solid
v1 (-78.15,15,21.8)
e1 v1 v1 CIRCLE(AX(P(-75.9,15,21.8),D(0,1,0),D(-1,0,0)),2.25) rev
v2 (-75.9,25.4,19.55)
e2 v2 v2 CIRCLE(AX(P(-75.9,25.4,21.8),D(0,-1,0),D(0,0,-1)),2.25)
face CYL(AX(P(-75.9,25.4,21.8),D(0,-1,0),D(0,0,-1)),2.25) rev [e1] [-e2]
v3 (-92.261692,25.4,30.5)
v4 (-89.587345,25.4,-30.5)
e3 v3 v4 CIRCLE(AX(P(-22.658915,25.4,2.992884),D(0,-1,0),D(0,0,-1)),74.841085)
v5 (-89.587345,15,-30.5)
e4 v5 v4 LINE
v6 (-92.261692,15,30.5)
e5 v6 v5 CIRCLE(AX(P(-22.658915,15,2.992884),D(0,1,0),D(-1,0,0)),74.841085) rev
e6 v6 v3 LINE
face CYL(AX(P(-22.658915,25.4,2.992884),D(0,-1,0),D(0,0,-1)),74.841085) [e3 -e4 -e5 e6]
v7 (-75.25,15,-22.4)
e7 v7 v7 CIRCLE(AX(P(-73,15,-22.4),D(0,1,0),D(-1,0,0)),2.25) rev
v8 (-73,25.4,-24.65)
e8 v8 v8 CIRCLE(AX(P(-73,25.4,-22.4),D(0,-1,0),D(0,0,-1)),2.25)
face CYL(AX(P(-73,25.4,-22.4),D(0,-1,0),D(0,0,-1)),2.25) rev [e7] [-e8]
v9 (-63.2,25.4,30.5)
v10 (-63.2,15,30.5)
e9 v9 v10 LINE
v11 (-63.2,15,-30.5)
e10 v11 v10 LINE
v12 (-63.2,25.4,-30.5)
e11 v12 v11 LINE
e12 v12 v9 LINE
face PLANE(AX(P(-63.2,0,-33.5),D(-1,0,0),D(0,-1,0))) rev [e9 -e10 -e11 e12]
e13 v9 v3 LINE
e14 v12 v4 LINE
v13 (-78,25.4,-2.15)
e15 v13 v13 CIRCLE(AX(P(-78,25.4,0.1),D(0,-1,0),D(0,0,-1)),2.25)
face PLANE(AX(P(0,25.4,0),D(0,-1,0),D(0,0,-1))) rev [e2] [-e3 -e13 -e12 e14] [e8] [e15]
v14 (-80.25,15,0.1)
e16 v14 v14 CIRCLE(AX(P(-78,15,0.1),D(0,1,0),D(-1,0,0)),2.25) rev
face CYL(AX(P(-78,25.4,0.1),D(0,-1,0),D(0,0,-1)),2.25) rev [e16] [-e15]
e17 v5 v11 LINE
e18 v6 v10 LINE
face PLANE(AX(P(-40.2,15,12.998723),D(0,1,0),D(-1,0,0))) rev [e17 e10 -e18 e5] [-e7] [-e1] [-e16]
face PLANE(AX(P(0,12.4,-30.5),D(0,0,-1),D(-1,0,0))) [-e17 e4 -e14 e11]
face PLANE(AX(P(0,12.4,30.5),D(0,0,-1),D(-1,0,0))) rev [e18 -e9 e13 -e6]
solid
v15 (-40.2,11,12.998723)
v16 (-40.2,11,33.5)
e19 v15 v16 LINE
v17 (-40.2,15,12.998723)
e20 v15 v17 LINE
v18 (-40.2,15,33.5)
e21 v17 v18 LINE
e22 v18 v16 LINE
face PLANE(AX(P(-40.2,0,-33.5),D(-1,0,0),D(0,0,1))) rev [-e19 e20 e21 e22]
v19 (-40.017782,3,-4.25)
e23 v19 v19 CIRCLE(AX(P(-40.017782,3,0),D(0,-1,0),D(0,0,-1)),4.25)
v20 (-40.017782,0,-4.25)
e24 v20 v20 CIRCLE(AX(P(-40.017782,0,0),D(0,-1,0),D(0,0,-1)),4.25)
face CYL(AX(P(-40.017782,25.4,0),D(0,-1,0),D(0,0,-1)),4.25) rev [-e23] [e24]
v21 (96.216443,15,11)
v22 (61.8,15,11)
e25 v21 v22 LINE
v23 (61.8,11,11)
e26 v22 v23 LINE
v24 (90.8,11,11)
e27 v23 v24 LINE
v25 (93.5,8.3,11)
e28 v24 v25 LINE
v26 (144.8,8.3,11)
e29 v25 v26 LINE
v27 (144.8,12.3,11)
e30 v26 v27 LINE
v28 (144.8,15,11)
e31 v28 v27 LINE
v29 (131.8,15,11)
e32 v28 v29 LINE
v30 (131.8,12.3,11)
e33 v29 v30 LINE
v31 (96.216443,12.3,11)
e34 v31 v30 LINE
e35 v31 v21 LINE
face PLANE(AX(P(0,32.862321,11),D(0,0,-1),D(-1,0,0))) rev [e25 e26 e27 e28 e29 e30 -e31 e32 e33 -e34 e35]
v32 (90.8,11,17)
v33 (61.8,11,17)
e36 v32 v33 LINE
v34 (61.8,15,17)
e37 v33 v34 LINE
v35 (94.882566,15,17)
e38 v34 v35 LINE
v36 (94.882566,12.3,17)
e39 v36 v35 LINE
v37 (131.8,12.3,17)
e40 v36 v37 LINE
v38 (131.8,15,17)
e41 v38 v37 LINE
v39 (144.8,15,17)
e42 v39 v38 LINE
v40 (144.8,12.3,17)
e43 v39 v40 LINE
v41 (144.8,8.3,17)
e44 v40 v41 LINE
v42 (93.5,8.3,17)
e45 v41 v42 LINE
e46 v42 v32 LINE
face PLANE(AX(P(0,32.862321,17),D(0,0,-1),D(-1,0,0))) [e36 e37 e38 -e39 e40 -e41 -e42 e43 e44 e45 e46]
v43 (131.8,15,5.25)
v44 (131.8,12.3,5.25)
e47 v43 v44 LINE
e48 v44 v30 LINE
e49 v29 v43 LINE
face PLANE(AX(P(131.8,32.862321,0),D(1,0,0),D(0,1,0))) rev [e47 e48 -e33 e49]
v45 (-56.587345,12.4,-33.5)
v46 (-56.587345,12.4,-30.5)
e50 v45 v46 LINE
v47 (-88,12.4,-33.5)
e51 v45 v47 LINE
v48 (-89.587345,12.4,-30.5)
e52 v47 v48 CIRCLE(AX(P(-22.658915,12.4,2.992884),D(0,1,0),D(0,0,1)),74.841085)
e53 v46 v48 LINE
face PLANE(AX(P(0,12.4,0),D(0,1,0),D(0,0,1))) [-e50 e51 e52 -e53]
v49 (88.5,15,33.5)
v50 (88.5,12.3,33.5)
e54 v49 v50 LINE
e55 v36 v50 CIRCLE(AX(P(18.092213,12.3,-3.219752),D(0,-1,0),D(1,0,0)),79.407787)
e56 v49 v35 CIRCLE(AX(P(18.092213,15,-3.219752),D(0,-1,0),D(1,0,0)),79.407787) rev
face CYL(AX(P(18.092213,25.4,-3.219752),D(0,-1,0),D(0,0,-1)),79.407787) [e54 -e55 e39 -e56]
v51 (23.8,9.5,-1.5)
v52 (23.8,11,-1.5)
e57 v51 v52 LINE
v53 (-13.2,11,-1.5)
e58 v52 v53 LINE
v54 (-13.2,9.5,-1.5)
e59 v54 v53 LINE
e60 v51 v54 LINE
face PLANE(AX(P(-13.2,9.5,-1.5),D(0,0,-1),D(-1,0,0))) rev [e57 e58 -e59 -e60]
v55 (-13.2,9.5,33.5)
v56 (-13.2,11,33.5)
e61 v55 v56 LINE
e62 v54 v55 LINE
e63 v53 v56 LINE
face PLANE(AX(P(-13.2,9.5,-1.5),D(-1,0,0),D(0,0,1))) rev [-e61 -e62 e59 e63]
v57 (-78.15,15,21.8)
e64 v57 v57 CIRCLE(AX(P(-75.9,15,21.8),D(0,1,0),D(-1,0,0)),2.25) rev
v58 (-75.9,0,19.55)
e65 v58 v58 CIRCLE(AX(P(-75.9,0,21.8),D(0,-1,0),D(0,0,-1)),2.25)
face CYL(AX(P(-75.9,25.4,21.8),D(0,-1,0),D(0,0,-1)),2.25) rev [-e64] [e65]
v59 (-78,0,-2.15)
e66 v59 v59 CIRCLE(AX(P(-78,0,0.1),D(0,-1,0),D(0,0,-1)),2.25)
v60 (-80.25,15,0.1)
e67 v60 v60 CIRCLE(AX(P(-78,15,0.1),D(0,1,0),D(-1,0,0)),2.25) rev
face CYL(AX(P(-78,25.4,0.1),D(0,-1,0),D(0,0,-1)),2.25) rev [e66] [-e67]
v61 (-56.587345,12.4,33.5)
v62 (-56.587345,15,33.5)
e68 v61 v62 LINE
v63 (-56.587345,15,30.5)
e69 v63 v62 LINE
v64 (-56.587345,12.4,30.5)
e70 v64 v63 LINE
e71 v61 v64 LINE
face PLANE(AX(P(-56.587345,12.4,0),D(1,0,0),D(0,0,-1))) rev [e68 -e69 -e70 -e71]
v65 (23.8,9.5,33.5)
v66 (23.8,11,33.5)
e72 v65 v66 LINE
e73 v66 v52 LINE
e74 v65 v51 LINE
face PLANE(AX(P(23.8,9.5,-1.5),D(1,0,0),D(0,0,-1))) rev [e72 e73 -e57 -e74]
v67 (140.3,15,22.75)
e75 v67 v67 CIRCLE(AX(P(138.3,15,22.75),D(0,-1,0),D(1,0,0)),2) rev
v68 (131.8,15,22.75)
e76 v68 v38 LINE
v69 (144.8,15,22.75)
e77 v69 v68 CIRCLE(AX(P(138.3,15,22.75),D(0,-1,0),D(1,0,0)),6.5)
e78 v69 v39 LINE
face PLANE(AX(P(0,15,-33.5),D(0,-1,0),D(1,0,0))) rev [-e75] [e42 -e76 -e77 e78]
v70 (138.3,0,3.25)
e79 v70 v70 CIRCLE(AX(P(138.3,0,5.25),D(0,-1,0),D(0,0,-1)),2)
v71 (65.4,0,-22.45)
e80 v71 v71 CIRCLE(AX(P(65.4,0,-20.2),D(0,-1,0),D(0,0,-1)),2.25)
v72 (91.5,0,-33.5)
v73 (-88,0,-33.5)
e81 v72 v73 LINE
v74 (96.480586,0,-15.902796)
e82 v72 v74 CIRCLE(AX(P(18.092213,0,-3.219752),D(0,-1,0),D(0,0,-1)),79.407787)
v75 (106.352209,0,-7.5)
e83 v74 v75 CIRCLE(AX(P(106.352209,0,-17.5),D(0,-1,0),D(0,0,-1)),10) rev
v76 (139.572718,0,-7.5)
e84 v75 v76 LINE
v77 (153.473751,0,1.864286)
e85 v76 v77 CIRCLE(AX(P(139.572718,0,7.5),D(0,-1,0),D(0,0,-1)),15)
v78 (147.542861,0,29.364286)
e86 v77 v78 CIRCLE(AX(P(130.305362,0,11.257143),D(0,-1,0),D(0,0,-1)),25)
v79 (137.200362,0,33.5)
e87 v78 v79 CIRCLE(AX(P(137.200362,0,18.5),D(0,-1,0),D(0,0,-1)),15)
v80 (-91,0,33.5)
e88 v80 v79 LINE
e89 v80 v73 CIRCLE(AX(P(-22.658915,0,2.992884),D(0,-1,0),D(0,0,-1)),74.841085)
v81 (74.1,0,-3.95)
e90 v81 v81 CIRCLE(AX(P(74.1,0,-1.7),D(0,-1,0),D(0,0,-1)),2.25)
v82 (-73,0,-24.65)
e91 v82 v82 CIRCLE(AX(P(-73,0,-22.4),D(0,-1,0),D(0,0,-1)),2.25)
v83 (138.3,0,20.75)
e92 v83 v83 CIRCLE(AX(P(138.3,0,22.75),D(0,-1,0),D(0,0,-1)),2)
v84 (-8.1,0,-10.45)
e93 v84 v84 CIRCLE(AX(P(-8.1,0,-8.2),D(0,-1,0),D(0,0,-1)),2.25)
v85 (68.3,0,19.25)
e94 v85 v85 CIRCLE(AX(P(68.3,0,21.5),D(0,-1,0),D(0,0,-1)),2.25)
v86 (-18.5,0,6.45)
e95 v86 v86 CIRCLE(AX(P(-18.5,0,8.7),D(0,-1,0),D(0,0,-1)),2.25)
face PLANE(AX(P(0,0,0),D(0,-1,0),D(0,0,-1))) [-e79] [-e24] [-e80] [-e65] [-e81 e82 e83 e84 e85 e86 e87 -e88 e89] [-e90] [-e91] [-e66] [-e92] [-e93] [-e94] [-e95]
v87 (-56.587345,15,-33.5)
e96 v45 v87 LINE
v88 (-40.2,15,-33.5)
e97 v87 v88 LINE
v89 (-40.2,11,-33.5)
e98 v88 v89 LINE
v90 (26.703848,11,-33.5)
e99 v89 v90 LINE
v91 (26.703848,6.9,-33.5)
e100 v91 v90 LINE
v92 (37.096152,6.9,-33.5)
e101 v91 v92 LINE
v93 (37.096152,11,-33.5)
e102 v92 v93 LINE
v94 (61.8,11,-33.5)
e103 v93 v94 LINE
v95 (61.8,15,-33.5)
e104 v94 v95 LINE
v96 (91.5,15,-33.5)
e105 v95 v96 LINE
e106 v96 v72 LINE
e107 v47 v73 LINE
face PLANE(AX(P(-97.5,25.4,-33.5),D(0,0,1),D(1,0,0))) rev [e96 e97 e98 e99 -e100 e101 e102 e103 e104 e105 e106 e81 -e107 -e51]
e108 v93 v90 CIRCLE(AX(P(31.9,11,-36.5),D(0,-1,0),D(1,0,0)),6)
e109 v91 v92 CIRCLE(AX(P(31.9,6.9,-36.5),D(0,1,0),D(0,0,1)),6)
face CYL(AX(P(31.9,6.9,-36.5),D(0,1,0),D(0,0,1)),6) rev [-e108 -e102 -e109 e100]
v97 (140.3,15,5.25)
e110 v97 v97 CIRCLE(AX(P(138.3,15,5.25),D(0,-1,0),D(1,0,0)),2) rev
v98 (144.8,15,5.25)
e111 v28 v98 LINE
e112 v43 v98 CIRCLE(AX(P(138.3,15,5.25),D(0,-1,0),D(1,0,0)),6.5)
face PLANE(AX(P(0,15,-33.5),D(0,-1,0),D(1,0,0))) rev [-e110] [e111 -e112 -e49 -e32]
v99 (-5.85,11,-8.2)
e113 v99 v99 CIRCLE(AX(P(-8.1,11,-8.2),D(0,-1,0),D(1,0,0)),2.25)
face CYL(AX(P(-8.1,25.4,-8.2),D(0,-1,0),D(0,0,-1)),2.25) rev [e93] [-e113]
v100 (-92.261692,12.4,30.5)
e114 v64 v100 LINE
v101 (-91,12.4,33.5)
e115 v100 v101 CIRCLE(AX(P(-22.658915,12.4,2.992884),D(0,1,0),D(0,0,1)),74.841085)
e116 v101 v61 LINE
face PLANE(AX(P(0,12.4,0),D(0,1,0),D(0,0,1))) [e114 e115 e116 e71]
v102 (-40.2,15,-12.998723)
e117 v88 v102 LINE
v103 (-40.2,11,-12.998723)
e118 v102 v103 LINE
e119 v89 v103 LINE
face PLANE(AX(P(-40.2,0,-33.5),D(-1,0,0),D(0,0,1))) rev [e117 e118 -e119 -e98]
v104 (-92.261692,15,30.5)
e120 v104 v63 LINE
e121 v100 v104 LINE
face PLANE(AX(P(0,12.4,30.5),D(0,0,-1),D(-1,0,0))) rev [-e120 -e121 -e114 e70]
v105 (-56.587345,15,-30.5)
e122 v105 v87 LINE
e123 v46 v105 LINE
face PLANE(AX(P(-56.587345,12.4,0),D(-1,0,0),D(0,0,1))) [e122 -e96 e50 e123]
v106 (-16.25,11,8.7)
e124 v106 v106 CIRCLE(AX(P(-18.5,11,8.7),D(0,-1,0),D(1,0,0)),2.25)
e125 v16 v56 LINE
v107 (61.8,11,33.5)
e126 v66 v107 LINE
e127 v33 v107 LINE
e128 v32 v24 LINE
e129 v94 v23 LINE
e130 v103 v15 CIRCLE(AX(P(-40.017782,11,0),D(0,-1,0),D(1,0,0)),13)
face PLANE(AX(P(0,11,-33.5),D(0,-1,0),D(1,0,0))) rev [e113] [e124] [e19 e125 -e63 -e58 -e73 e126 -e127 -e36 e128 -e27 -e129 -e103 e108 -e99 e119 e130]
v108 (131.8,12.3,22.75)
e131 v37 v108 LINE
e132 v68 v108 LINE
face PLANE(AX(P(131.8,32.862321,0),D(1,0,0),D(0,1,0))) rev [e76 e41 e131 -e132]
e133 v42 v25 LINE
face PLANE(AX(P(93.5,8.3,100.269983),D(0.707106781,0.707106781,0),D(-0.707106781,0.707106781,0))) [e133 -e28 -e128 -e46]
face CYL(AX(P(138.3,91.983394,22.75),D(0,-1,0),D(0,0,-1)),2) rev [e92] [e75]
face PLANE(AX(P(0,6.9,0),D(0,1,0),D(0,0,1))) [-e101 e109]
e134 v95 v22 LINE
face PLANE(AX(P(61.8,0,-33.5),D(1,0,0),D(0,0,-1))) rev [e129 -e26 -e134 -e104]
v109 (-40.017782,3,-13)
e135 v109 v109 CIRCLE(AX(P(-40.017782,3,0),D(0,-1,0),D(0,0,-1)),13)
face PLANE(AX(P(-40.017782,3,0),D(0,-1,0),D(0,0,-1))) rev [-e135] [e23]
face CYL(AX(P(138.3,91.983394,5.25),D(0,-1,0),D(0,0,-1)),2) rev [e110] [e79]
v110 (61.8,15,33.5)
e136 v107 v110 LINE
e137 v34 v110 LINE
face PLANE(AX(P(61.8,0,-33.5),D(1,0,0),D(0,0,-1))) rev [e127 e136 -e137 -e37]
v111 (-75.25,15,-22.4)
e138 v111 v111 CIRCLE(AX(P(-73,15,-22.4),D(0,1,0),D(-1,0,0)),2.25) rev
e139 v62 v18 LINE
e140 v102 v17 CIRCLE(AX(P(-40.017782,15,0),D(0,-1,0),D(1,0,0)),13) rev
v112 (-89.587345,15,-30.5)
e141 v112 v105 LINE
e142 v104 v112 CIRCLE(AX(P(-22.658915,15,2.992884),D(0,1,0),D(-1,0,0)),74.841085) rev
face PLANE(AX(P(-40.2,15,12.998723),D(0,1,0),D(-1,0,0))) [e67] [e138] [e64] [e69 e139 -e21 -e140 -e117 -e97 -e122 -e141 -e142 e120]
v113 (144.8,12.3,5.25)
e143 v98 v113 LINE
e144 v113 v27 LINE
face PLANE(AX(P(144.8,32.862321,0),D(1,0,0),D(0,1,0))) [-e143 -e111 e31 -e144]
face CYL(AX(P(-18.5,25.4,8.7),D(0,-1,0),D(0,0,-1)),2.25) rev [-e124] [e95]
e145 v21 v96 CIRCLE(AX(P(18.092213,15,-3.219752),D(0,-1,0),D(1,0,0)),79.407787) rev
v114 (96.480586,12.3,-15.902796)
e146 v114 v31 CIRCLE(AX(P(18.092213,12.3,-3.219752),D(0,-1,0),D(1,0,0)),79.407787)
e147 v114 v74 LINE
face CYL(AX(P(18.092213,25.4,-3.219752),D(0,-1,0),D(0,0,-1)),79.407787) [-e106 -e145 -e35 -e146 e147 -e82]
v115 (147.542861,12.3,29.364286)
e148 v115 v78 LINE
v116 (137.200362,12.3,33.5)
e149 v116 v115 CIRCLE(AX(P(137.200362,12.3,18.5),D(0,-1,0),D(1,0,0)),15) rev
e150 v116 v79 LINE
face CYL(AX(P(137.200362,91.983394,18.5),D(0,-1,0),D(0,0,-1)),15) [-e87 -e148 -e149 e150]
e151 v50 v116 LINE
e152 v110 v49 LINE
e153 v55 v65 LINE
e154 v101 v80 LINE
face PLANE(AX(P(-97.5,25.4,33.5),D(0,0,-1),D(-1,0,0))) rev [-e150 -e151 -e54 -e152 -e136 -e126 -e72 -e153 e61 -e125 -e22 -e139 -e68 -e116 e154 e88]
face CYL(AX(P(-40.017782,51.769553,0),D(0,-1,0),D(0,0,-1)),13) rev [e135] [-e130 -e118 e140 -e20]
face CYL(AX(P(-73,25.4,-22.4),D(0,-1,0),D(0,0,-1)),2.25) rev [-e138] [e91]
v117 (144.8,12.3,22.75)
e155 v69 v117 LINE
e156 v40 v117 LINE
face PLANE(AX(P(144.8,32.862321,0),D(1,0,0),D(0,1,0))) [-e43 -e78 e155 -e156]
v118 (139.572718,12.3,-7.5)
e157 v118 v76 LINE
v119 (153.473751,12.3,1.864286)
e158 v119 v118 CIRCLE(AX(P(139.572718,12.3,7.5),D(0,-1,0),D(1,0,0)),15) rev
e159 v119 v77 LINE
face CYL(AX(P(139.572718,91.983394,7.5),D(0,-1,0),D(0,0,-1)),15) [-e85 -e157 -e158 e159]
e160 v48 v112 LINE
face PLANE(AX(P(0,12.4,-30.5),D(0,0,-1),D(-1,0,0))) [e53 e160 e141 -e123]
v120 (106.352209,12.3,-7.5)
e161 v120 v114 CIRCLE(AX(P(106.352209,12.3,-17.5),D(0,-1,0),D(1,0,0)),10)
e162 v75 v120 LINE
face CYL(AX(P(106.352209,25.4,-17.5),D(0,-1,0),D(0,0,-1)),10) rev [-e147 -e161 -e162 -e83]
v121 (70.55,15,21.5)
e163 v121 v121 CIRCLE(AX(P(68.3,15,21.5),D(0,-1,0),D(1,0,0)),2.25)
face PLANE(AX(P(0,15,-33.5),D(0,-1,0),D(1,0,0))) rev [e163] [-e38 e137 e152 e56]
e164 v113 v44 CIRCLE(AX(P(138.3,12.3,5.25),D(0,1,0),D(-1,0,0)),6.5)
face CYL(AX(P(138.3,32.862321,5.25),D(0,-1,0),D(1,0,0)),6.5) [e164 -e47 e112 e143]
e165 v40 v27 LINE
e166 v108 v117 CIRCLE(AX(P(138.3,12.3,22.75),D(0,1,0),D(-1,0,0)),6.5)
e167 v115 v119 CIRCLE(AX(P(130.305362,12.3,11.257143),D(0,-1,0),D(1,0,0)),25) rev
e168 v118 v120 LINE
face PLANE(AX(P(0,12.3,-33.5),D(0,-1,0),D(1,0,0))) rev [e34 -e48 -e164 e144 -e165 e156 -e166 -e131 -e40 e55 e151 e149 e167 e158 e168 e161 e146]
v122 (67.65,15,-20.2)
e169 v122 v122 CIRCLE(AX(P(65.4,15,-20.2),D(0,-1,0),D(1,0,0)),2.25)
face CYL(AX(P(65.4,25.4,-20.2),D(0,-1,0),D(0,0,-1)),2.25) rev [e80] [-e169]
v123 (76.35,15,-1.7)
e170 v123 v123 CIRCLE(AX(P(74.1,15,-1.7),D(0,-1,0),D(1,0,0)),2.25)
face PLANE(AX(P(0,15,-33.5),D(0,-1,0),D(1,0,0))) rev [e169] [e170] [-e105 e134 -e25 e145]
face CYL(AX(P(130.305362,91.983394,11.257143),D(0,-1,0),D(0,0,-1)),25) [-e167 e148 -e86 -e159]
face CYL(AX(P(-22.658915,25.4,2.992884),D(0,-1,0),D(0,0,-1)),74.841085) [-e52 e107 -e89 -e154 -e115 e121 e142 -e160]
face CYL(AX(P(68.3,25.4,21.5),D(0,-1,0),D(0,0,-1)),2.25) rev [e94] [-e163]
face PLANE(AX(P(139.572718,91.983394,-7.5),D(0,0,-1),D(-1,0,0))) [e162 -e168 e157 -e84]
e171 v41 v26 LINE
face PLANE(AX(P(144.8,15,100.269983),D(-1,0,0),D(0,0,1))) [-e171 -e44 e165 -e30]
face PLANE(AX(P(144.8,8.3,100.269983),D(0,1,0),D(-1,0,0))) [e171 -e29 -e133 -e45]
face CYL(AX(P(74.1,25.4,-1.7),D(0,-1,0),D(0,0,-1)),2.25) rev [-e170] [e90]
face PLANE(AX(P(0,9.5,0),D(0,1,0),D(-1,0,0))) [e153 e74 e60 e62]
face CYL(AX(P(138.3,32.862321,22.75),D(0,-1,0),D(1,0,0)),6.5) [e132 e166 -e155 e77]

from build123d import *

# Parameters (mm, degrees)
SKETCH1_W           = 195
SKETCH1_H           = 67
BOSS_EXTRUDE1_DEPTH = 25.4
CUT_EXTRUDE1_DEPTH  = 107.177492907
CUT_EXTRUDE2_DEPTH  = 121.997561959
CUT_EXTRUDE3_START  = -13
SKETCH4_W           = 6.612655346
SKETCH4_H           = 3
CUT_EXTRUDE3_DEPTH  = 13
SKETCH6_R           = 2.25
CUT_EXTRUDE4_DEPTH  = 107.177492907
SKETCH7_W           = 37
SKETCH7_H           = 35
CUT_EXTRUDE5_DEPTH  = 1.5
CUT_EXTRUDE6_DEPTH  = 18.5
SKETCH9_R           = 2
BOSS_EXTRUDE2_DEPTH = 12.3
FILLET1_R           = 10
CUT_EXTRUDE7_REACH  = 165.895
CUT_EXTRUDE7_START  = -3
SKETCH10_R          = 13
SKETCH13_R          = 4.25
CUT_EXTRUDE9_DEPTH  = 161.89488962
SKETCH11_R          = 2
BOSS_EXTRUDE3_DEPTH = 2.7
CUT_EXTRUDE8_DEPTH  = 6


# Read off the part's stored shape, not the designer's step: Split1
with BuildPart() as part:
    # Sketch1 → Boss-Extrude1 (new body)
    with BuildSketch(Plane(origin=(0, 0, 0), x_dir=(1, 0, 0), z_dir=(0, 1, 0))):
        Rectangle(SKETCH1_W, SKETCH1_H)
    extrude(amount=BOSS_EXTRUDE1_DEPTH)

    # Sketch2 → Cut-Extrude1 (cut, through all)
    with BuildSketch(Plane.XZ):
        with BuildLine():
            Line((97.5, -3.219751644), (97.5, 33.5))
            Line((97.5, 33.5), (88.5, 33.5))
            ThreePointArc((88.5, 33.5), (95.217186872, 15.683556008), (97.5, -3.219751644))
        make_face()
        with BuildLine():
            Line((97.5, -33.5), (97.5, -3.219751644))
            ThreePointArc((97.5, -3.219751644), (95.985558513, -18.65423771), (91.5, -33.5))
            Line((91.5, -33.5), (97.5, -33.5))
        make_face()
        with BuildLine():
            ThreePointArc((-88, -33.5), (-95.08607052, -15.861694529), (-97.5, 2.992884749))
            Line((-97.5, 2.992884749), (-97.5, -33.5))
            Line((-97.5, -33.5), (-88, -33.5))
        make_face()
        with BuildLine():
            ThreePointArc((-97.5, 2.992884749), (-95.856964648, 18.588830376), (-91, 33.5))
            Line((-91, 33.5), (-97.5, 33.5))
            Line((-97.5, 33.5), (-97.5, 2.992884749))
        make_face()
    extrude(amount=-CUT_EXTRUDE1_DEPTH, mode=Mode.SUBTRACT)

    # Sketch3 → Cut-Extrude2 (cut, through all)
    with BuildSketch(Plane(origin=(0, 0, 33.5), x_dir=(-1, 0, 0), z_dir=(0, 0, -1))):
        Polygon((63.2, 25.4), (63.2, 15), (40.2, 15), (40.2, 11), (-61.8, 11), (-61.8, 15), (-97.5, 15), (-97.5, 25.4), align=None)
    extrude(amount=CUT_EXTRUDE2_DEPTH, mode=Mode.SUBTRACT)

    # Sketch4 → Cut-Extrude3 (cut)
    with BuildSketch(Plane(origin=(0, 25.4, 0), x_dir=(1, 0, 0), z_dir=(0, 1, 0)).offset(CUT_EXTRUDE3_START)):
        with BuildLine():
            Line((-63.2, 30.5), (-63.2, 33.5))
            Line((-63.2, 33.5), (-88, 33.5))
            ThreePointArc((-88, 33.5), (-88.810680862, 32.008999469), (-89.587344654, 30.5))
            Line((-89.587344654, 30.5), (-63.2, 30.5))
        make_face()
        with Locations((-59.893672327, 32)):
            Rectangle(SKETCH4_W, SKETCH4_H)
        with BuildLine():
            Line((-63.2, -33.5), (-63.2, -30.5))
            Line((-63.2, -30.5), (-92.261692194, -30.5))
            ThreePointArc((-92.261692194, -30.5), (-91.647155152, -32.006859002), (-91, -33.5))
            Line((-91, -33.5), (-63.2, -33.5))
        make_face()
        with Locations((-59.893672327, -32)):
            Rectangle(SKETCH4_W, SKETCH4_H)
    extrude(amount=CUT_EXTRUDE3_DEPTH, mode=Mode.SUBTRACT)

    # Sketch6 → Cut-Extrude4 (cut, through all)
    with BuildSketch(Plane.XZ):
        with Locations(Location((-18.5, 8.7, 0), (0, 0, 270))):
            Circle(SKETCH6_R)
        with Locations(Location((74.1, -1.7, 0), (0, 0, 270))):
            Circle(SKETCH6_R)
        with Locations(Location((68.3, 21.5, 0), (0, 0, 270))):
            Circle(SKETCH6_R)
        with Locations(Location((65.4, -20.2, 0), (0, 0, 270))):
            Circle(SKETCH6_R)
        with Locations(Location((-8.1, -8.2, 0), (0, 0, 270))):
            Circle(SKETCH6_R)
        with Locations(Location((-75.9, 21.8, 0), (0, 0, 270))):
            Circle(SKETCH6_R)
        with Locations(Location((-78, 0.1, 0), (0, 0, 270))):
            Circle(SKETCH6_R)
        with Locations(Location((-73, -22.4, 0), (0, 0, 270))):
            Circle(SKETCH6_R)
    extrude(amount=-CUT_EXTRUDE4_DEPTH, mode=Mode.SUBTRACT)

    # Sketch7 → Cut-Extrude5 (cut)
    with BuildSketch(Plane(origin=(0, 11, 0), x_dir=(1, 0, 0), z_dir=(0, 1, 0))):
        with Locations((5.3, -16)):
            Rectangle(SKETCH7_W, SKETCH7_H)
    extrude(amount=-CUT_EXTRUDE5_DEPTH, mode=Mode.SUBTRACT)

    # Sketch8 → Cut-Extrude6 (cut)
    with BuildSketch(Plane(origin=(0, 25.4, 0), x_dir=(1, 0, 0), z_dir=(0, 1, 0))):
        with BuildLine():
            Line((37.096152423, 33.5), (31.9, 33.5))
            Line((31.9, 33.5), (31.9, 30.5))
            ThreePointArc((31.9, 30.5), (34.9, 31.303847577), (37.096152423, 33.5))
        make_face()
        with BuildLine():
            Line((31.9, 33.5), (26.703847577, 33.5))
            ThreePointArc((26.703847577, 33.5), (28.9, 31.303847577), (31.9, 30.5))
            Line((31.9, 30.5), (31.9, 33.5))
        make_face()
    extrude(amount=-CUT_EXTRUDE6_DEPTH, mode=Mode.SUBTRACT)

    # Sketch9 → Boss-Extrude2 (add)
    with BuildSketch(Plane.XZ):
        with BuildLine():
            Line((88.5, 33.5), (137.200361796, 33.5))
            ThreePointArc((137.200361796, 33.5), (142.769729546, 32.427747228), (147.542861296, 29.364285714))
            ThreePointArc((147.542861296, 29.364285714), (154.743476693, 16.527679502), (153.473750823, 1.864285714))
            ThreePointArc((153.473750823, 1.864285714), (147.953179578, -4.940573023), (139.572717606, -7.5))
            Line((139.572717606, -7.5), (97.384558849, -7.5))
            ThreePointArc((97.384558849, -7.5), (95.698800641, 13.597328658), (88.5, 33.5))
        make_face()
        with Locations(Location((138.3, 5.25, 0), (0, 0, 270))):
            Circle(SKETCH9_R, mode=Mode.SUBTRACT)
        with Locations(Location((138.3, 22.75, 0), (0, 0, 270))):
            Circle(SKETCH9_R, mode=Mode.SUBTRACT)
    extrude(amount=-BOSS_EXTRUDE2_DEPTH)

    # Fillet1
    fillet1_edges = [part.edges().sort_by_distance(p)[0] for p in [
        (97.384558849, 6.15, -7.5),
    ]]
    fillet(fillet1_edges, radius=FILLET1_R)

    # Cut-Extrude7: up to this face of the body (flat: up to its plane)
    cut_extrude7_end = Plane(part.part.faces().sort_by_distance((-51.483463415, 15, 0))[0])
    # Sketch10 → Cut-Extrude7 (cut, up to the picked face)
    with BuildSketch(Plane.XZ.offset(CUT_EXTRUDE7_START), mode=Mode.PRIVATE) as cut_extrude7_sk1:
        with Locations(Location((-40.017782272, 0, 0), (0, 0, 270))):
            Circle(SKETCH10_R)
    cut_extrude7_tool1 = split(extrude(cut_extrude7_sk1.sketch, amount=-CUT_EXTRUDE7_REACH, mode=Mode.PRIVATE), bisect_by=cut_extrude7_end, keep=Keep.BOTH, mode=Mode.PRIVATE)
    add(cut_extrude7_tool1.solids().sort_by(Axis((-40.017782, 3, 0), (0, 1, 0)))[0], mode=Mode.SUBTRACT)

    # Sketch13 → Cut-Extrude9 (cut, through all)
    with BuildSketch(Plane.XZ):
        with Locations(Location((-40.017782272, 0, 0), (0, 0, 270))):
            Circle(SKETCH13_R)
    extrude(amount=-CUT_EXTRUDE9_DEPTH, mode=Mode.SUBTRACT)

    # Sketch11 → Boss-Extrude3 (add)
    # profile 1 of 2: a face of its own
    with BuildSketch(Plane(origin=(0, 12.3, 0), x_dir=(1, 0, 0), z_dir=(0, 1, 0))):
        with BuildLine():
            Line((144.8, -11), (144.8, -5.25))
            ThreePointArc((144.8, -5.25), (138.3, 1.25), (131.8, -5.25))
            Line((131.8, -5.25), (131.8, -11))
            Line((131.8, -11), (144.8, -11))
        make_face()
        with Locations(Location((138.3, -5.25, 0), (0, 0, 90))):
            Circle(SKETCH11_R, mode=Mode.SUBTRACT)
    # profile 2 of 2: a face of its own
    with BuildSketch(Plane(origin=(0, 12.3, 0), x_dir=(1, 0, 0), z_dir=(0, 1, 0))):
        with BuildLine():
            Line((144.8, -22.75), (144.8, -17))
            Line((144.8, -17), (131.8, -17))
            Line((131.8, -17), (131.8, -22.75))
            ThreePointArc((131.8, -22.75), (138.3, -29.25), (144.8, -22.75))
        make_face()
        with Locations(Location((138.3, -22.75, 0), (0, 0, 90))):
            Circle(SKETCH11_R, mode=Mode.SUBTRACT)
    extrude(amount=BOSS_EXTRUDE3_DEPTH)

    # Sketch12 → Cut-Extrude8 (cut)
    with BuildSketch(Plane.XY.offset(11)):
        Polygon((144.8, 15), (144.8, 8.3), (93.5, 8.3), (90.8, 11), (61.8, 11), (61.8, 15), align=None)
    extrude(amount=CUT_EXTRUDE8_DEPTH, mode=Mode.SUBTRACT)


with BuildPart() as body_2:
    # Split1: the piece on the far side of the plane
    add(part.part)
    split(bisect_by=Plane(origin=(0, 15, 0), x_dir=(1, 0, 0), z_dir=(0, 1, 0)), keep=Keep.BOTTOM)


with BuildPart() as part_1:
    add(part.part)

    # Split1
    split(bisect_by=Plane(origin=(0, 15, 0), x_dir=(1, 0, 0), z_dir=(0, 1, 0)), keep=Keep.TOP)


solid = Compound([body_2.part, part_1.part])
